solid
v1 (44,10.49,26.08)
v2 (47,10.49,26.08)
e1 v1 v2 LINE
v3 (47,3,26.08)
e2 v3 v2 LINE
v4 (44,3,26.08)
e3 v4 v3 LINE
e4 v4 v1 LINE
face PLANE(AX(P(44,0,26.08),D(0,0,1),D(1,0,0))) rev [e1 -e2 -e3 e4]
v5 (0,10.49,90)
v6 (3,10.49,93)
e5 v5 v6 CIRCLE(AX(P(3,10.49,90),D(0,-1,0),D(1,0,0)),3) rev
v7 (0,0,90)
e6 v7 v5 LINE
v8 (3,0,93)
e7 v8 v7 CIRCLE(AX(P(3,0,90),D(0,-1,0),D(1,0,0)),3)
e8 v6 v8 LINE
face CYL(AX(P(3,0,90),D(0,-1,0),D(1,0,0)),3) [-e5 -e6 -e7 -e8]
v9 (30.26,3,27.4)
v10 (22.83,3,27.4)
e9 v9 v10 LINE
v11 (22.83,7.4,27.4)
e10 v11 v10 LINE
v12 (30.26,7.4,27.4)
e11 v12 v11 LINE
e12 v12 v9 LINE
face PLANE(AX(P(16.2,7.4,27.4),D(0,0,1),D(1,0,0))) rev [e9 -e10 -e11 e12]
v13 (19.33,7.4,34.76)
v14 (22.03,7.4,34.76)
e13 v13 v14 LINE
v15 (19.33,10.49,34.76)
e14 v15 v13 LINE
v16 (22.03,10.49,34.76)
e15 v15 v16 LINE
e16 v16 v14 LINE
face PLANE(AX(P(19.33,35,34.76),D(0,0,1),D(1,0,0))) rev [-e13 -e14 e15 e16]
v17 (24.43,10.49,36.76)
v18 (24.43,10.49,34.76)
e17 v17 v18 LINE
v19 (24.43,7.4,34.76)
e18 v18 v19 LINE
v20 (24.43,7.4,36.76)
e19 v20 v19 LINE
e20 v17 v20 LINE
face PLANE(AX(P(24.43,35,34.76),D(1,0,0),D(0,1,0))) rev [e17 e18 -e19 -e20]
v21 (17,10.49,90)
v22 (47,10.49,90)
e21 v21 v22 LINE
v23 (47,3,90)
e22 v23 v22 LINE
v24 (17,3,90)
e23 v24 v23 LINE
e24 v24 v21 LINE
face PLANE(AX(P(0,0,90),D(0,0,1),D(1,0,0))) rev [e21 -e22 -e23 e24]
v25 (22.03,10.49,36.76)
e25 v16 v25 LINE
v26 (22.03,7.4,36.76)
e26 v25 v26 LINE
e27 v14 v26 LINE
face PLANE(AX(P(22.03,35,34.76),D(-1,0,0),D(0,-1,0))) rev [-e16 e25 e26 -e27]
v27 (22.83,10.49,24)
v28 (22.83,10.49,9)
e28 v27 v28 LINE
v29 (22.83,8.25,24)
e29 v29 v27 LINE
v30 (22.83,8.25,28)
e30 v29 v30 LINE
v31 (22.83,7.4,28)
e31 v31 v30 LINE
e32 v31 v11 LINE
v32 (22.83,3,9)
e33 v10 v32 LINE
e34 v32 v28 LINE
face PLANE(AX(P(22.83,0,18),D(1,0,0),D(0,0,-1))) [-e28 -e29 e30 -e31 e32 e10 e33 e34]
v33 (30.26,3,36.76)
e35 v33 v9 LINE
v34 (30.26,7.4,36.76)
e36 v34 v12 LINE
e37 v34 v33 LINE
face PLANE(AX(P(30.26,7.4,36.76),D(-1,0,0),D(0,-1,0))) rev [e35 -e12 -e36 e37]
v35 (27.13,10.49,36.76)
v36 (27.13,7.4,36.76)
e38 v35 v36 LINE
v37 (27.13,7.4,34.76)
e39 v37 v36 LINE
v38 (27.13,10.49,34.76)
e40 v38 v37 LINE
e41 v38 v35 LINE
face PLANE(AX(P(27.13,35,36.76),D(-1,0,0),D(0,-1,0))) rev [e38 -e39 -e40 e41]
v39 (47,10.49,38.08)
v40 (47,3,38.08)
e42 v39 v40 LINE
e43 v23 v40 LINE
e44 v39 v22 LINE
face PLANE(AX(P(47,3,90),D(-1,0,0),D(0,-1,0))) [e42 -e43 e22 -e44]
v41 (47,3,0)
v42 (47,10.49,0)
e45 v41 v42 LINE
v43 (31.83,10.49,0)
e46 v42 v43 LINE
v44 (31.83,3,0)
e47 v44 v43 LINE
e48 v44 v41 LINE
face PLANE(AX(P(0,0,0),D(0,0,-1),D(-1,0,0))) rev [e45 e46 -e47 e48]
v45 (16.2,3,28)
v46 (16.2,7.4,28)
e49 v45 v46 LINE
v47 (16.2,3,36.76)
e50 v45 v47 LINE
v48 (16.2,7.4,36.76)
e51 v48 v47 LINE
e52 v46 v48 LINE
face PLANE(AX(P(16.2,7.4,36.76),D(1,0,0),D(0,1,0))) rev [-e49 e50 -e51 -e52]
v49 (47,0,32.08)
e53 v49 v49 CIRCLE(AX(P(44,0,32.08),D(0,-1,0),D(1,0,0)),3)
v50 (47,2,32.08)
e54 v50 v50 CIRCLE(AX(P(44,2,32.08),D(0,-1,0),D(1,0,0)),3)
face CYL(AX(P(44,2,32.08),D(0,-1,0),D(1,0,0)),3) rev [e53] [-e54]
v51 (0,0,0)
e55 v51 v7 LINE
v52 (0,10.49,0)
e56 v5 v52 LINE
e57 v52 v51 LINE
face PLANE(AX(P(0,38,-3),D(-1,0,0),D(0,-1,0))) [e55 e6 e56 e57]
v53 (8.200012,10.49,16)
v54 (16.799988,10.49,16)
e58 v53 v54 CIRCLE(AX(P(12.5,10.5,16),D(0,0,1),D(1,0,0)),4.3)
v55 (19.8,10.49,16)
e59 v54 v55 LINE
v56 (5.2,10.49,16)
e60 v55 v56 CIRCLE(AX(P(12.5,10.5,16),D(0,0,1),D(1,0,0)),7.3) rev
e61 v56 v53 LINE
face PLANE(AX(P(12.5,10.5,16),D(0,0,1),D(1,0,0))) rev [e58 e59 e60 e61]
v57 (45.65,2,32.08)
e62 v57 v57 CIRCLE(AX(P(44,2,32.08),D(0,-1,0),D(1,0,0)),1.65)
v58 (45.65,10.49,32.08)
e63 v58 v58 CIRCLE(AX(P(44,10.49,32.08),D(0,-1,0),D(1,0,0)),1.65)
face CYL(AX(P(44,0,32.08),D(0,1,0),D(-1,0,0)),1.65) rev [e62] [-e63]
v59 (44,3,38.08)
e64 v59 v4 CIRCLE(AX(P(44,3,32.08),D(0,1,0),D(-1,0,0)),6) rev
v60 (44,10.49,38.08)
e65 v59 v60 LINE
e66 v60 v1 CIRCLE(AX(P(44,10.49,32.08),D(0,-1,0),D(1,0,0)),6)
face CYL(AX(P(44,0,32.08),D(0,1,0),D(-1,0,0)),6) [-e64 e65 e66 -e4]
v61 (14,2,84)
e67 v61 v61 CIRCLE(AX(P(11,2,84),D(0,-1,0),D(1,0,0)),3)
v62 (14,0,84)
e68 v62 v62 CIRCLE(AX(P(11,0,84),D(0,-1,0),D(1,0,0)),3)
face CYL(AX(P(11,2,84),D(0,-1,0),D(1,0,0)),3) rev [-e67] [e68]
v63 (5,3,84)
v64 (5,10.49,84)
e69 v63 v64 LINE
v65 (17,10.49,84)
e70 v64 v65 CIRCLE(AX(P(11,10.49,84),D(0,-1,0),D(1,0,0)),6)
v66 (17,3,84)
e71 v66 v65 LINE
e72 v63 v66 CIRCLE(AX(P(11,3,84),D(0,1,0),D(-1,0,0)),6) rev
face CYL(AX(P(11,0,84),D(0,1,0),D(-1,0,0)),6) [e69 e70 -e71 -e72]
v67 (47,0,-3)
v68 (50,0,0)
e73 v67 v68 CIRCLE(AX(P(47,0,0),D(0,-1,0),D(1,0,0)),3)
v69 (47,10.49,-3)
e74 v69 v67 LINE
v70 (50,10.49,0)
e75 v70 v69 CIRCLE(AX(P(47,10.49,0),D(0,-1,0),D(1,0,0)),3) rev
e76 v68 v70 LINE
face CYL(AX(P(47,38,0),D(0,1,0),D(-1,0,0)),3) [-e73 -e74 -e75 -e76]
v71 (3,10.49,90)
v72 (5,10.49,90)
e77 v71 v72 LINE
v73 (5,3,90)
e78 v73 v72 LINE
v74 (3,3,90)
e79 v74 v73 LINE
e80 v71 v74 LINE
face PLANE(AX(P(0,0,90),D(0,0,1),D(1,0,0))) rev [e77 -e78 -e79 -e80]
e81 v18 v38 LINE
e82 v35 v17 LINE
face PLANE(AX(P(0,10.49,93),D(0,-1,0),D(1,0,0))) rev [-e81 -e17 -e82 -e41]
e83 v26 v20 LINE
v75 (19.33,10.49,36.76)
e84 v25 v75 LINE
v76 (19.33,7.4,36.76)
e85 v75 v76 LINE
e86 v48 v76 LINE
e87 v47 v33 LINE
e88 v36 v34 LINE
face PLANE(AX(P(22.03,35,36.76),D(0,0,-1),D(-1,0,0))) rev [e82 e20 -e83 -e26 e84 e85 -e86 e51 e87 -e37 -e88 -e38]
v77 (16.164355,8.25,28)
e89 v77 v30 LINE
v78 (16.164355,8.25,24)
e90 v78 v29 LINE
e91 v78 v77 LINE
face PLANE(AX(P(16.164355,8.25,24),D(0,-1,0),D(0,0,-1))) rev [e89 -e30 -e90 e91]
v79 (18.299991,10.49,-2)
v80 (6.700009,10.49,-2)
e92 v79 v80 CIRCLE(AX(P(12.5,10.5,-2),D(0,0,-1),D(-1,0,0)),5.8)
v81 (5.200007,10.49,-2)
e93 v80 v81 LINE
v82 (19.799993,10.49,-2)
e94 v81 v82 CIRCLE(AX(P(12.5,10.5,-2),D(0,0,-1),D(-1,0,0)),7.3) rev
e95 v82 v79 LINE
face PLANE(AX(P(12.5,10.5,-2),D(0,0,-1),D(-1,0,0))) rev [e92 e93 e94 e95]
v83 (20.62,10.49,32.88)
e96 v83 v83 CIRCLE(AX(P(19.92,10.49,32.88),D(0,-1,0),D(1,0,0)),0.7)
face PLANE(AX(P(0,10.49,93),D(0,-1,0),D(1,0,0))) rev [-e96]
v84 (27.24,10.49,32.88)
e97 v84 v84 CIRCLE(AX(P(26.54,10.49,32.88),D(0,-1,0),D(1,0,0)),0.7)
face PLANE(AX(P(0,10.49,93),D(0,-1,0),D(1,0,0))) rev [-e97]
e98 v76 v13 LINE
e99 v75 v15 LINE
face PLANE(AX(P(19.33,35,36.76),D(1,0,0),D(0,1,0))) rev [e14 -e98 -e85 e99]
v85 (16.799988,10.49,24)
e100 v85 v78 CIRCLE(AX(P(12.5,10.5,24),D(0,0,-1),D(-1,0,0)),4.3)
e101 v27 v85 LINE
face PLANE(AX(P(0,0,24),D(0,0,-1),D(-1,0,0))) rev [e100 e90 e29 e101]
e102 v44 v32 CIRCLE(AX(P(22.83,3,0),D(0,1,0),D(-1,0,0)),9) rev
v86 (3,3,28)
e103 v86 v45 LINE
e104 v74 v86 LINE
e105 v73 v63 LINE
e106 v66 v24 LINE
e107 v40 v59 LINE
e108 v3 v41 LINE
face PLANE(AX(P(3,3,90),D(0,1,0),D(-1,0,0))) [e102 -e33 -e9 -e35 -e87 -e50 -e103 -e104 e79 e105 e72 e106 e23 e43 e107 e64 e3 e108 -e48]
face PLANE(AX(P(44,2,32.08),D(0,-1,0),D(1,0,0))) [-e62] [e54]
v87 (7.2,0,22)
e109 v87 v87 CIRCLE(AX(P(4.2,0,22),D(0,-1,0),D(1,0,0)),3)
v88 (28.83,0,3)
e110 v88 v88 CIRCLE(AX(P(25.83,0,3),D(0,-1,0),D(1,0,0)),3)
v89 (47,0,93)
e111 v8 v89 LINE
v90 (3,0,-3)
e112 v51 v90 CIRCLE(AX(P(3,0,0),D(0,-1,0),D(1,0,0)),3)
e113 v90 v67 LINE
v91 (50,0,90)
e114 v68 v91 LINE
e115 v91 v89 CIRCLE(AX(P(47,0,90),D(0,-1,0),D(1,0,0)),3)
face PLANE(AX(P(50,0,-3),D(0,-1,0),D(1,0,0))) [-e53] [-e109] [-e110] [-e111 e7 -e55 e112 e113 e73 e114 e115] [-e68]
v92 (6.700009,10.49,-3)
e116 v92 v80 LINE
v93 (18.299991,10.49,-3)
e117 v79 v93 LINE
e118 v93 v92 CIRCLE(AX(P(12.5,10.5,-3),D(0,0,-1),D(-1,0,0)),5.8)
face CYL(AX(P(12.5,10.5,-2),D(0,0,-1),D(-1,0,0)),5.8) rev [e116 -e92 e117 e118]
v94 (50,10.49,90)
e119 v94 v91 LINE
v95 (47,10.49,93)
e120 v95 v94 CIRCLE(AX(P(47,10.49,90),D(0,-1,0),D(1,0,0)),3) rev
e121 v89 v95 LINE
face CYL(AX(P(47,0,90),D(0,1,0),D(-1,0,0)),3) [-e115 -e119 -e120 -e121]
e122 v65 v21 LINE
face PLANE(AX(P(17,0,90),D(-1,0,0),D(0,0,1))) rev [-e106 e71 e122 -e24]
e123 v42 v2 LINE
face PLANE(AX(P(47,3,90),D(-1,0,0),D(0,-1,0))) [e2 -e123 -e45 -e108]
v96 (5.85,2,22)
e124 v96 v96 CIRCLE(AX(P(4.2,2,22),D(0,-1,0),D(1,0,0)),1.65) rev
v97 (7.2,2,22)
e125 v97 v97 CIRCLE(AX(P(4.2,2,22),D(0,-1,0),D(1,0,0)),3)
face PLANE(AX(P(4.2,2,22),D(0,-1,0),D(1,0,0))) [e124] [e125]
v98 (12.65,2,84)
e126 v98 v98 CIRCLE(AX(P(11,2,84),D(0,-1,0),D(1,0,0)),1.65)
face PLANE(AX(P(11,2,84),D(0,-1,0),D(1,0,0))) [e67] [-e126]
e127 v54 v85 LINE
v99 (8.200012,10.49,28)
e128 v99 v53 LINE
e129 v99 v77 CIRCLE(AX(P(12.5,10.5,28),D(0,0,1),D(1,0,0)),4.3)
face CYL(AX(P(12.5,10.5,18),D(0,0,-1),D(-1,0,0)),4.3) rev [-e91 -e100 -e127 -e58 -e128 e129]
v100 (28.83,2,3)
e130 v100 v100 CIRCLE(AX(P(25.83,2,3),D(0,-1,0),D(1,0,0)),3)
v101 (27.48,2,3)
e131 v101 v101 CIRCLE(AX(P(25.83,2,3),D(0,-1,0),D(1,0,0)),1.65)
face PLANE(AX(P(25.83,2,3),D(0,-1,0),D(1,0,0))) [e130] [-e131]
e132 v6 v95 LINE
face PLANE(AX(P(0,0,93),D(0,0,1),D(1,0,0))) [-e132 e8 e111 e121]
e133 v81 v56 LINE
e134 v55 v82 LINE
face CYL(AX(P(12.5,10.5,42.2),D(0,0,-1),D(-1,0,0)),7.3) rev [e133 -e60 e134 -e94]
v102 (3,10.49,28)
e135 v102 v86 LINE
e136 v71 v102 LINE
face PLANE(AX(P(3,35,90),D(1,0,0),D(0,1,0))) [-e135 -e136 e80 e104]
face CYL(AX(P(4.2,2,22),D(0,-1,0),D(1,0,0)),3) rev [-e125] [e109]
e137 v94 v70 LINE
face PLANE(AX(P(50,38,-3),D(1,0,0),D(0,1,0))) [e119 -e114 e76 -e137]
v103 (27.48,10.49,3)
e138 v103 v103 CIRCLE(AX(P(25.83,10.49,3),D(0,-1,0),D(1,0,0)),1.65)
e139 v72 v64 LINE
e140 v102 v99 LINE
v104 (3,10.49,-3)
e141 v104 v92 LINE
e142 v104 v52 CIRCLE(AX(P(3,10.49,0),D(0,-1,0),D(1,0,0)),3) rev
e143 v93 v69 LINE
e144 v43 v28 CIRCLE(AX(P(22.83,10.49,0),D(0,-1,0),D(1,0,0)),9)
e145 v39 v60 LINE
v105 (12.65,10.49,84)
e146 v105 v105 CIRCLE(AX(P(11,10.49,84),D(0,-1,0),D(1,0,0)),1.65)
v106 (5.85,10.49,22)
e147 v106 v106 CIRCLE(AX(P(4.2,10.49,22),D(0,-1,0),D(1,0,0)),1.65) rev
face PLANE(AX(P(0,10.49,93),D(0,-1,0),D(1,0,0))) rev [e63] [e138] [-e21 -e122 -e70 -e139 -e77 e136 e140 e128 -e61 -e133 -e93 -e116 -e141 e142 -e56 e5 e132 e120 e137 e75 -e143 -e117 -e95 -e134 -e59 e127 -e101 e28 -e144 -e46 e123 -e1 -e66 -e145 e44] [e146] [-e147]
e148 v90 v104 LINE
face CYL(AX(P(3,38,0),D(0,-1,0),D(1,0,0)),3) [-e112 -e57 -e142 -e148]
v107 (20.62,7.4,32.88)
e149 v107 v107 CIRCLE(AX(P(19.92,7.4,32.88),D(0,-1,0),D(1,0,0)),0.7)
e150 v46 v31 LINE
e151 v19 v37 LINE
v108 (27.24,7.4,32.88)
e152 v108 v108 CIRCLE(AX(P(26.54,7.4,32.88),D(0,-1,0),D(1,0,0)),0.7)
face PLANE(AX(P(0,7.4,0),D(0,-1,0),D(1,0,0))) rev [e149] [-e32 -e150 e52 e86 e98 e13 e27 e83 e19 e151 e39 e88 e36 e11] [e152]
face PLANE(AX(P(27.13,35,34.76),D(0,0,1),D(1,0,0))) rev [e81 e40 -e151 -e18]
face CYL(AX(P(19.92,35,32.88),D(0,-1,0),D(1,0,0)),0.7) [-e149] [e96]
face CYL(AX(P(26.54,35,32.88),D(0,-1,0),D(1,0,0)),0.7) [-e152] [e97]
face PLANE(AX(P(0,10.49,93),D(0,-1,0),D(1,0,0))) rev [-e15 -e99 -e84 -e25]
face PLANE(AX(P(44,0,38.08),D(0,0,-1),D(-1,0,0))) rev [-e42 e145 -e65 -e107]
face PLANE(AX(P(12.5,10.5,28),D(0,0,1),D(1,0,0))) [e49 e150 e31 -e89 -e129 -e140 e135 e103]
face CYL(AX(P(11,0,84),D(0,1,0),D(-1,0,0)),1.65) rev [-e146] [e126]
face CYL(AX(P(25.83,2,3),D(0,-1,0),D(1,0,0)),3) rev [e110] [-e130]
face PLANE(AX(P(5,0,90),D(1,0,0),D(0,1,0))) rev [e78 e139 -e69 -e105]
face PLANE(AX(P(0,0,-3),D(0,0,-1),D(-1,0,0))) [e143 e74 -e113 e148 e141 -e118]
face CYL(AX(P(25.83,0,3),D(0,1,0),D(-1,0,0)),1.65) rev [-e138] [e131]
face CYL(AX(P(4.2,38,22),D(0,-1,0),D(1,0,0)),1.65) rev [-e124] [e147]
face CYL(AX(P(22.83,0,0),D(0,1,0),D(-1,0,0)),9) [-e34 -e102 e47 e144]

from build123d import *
from build123d.topology import SkipClean

# Parameters (mm, degrees)
SKETCH_1_W               = 50
SKETCH_1_H               = 38
EXTRUDE_1_DEPTH          = 3
SKETCH_2_W               = 50
SKETCH_2_H               = 38
SKETCH_2_W_2             = 44
SKETCH_2_H_2             = 32
EXTRUDE_2_DEPTH          = 90
SKETCH_4_R               = 7.3
CUT_EXTRUDE_1_DEPTH      = 45.2
SKETCH_5_R               = 10.3
SKETCH_5_R_2             = 7.3
EXTRUDE_3_DEPTH          = 16
SKETCH_6_R               = 8.3
SKETCH_6_R_2             = 5.8
EXTRUDE_5_DEPTH          = 1
SKETCH_7_R               = 4.3
EXTRUDE_6_DEPTH          = 2
SKETCH_8_R               = 6.3
SKETCH_8_R_2             = 4.3
EXTRUDE_7_DEPTH          = 10
SKETCH_9_W               = 2.635644668
SKETCH_9_H               = 4.5
CUT_EXTRUDE_2_DEPTH      = 4
SKETCH_10_R              = 0.7
SKETCH_10_W              = 2.7
SKETCH_10_H              = 2
EXTRUDE_8_DEPTH          = 32
SKETCH_11_W              = 14.06
SKETCH_11_H              = 9.36
EXTRUDE_9_DEPTH          = 4.4
SKETCH_12_W              = 14.06
SKETCH_12_H              = 9.36
EXTRUDE_10_DEPTH         = 21.2
CUT_EXTRUDE_3_DEPTH      = 3
SKETCH_14_R              = 1.65
EXTRUDE_11_DEPTH         = 15.5
EXTRUDE_12_DEPTH         = 15.5
CUT_EXTRUDE_4_DEPTH      = 0.8
EXTRUDE_13_DEPTH         = 18
SKETCH_18_W              = 19.83
SKETCH_18_H              = 32
SKETCH_18_R              = 6.3
EXTRUDE_14_DEPTH         = 10
SKETCH_19_W              = 4.445486426
SKETCH_19_H              = 4.5
CUT_EXTRUDE_5_DEPTH      = 4
EXTRUDE_16_REACH         = 110.743
SKETCH_23_R              = 1.65
CUT_EXTRUDE_7_DEPTH      = 109.742815855
CUT_EXTRUDE_7_DEPTH_BACK = 109.742815855
SKETCH_25_R              = 1.65
CUT_EXTRUDE_8_DEPTH      = 24.5
SKETCH_29_W              = 50
SKETCH_29_H              = 38
EXTRUDE_17_DEPTH         = 3
FILLET_1_R               = 3
SKETCH_30_W              = 96
SKETCH_30_H              = 0.02
CUT_EXTRUDE_9_DEPTH      = 113.218536793
SKETCH_31_R              = 3
CUT_EXTRUDE_10_DEPTH     = 2


with BuildPart() as part:
    # 草图1 → 凸台-拉伸1 (new body)
    with BuildSketch(Plane.XY):
        with Locations((25, 19)):
            Rectangle(SKETCH_1_W, SKETCH_1_H)
    extrude(amount=-EXTRUDE_1_DEPTH)

    # 草图2 → 凸台-拉伸2 (add)
    with BuildSketch(Plane.XY):
        with Locations((25, 19)):
            Rectangle(SKETCH_2_W, SKETCH_2_H)
        with Locations((25, 19)):
            Rectangle(SKETCH_2_W_2, SKETCH_2_H_2, mode=Mode.SUBTRACT)
    extrude(amount=EXTRUDE_2_DEPTH)

    # 草图4 → 切除-拉伸1 (cut)
    with BuildSketch(Plane(origin=(0, 0, -3), x_dir=(-1, 0, 0), z_dir=(0, 0, -1))):
        with Locations((-12.5, 10.5)):
            Circle(SKETCH_4_R)
    extrude(amount=-CUT_EXTRUDE_1_DEPTH, mode=Mode.SUBTRACT)

    # 草图5 → 凸台-拉伸3 (add)
    with BuildSketch(Plane.XY):
        with Locations((12.5, 10.5)):
            Circle(SKETCH_5_R)
        with Locations(Location((12.5, 10.5, 0), (0, 0, 180))):
            Circle(SKETCH_5_R_2, mode=Mode.SUBTRACT)
    extrude(amount=EXTRUDE_3_DEPTH)

    # 草图6 → 凸台-拉伸5 (add)
    with BuildSketch(Plane(origin=(0, 0, -3), x_dir=(-1, 0, 0), z_dir=(0, 0, -1))):
        with Locations((-12.5, 10.5)):
            Circle(SKETCH_6_R)
        with Locations((-12.5, 10.5)):
            Circle(SKETCH_6_R_2, mode=Mode.SUBTRACT)
    extrude(amount=-EXTRUDE_5_DEPTH)

    # 草图7 → 凸台-拉伸6 (add)
    with BuildSketch(Plane.XY.offset(16)):
        with BuildLine():
            Line((5.440254962, 3), (19.559745038, 3))
            ThreePointArc((19.559745038, 3), (18.368221419, 18.964867239), (3, 14.479949748))
            Line((3, 14.479949748), (3, 6.520050252))
            ThreePointArc((3, 6.520050252), (4.035132761, 4.631778581), (5.440254962, 3))
        make_face()
        with Locations((12.5, 10.5)):
            Circle(SKETCH_7_R, mode=Mode.SUBTRACT)
    extrude(amount=EXTRUDE_6_DEPTH)

    # 草图8 → 凸台-拉伸7 (add)
    with BuildSketch(Plane.XY.offset(18)):
        with Locations((12.5, 10.5)):
            Circle(SKETCH_8_R)
        with Locations((12.5, 10.5)):
            Circle(SKETCH_8_R_2, mode=Mode.SUBTRACT)
    extrude(amount=EXTRUDE_7_DEPTH)

    # 草图9 → 切除-拉伸2 (cut)
    with BuildSketch(Plane.XY.offset(28)):
        with Locations((17.482177666, 10.5)):
            Rectangle(SKETCH_9_W, SKETCH_9_H)
    extrude(amount=-CUT_EXTRUDE_2_DEPTH, mode=Mode.SUBTRACT)

    # 草图10 → 凸台-拉伸8 (add)
    with BuildSketch(Plane(origin=(0, 3, 0), x_dir=(1, 0, 0), z_dir=(0, 1, 0))):
        with Locations(Location((19.92, -32.88, 0), (0, 0, 180))):
            Circle(SKETCH_10_R)
        with Locations(Location((26.54, -32.88, 0), (0, 0, 180))):
            Circle(SKETCH_10_R)
        with Locations((20.68, -35.76)):
            Rectangle(SKETCH_10_W, SKETCH_10_H)
        with Locations((25.78, -35.76)):
            Rectangle(SKETCH_10_W, SKETCH_10_H)
    extrude(amount=EXTRUDE_8_DEPTH)

    # 草图11 → 凸台-拉伸9 (add)
    with BuildSketch(Plane(origin=(0, 3, 0), x_dir=(1, 0, 0), z_dir=(0, 1, 0))):
        with Locations((23.23, -32.08)):
            Rectangle(SKETCH_11_W, SKETCH_11_H)
    extrude(amount=EXTRUDE_9_DEPTH)

    # 草图12 → 凸台-拉伸10 (add)
    with BuildSketch(Plane.XZ.offset(-35)):
        with Locations((23.23, 32.08)):
            Rectangle(SKETCH_12_W, SKETCH_12_H)
    extrude(amount=EXTRUDE_10_DEPTH)

    # 草图13 → 切除-拉伸3 (cut)
    with BuildSketch(Plane(origin=(0, 38, 0), x_dir=(1, 0, 0), z_dir=(0, 1, 0))):
        with BuildLine():
            Line((38.62497216, -74.195968058), (44.4, -74.195968058))
            ThreePointArc((44.4, -74.195968058), (45.107106781, -73.903074839), (45.4, -73.195968058))
            Line((45.4, -73.195968058), (45.4, -54.995968058))
            ThreePointArc((45.4, -54.995968058), (45.107106781, -54.288861277), (44.4, -53.995968058))
            Line((44.4, -53.995968058), (38.62497216, -53.995968058))
            ThreePointArc((38.62497216, -53.995968058), (12.3, -64.095968058), (38.62497216, -74.195968058))
        make_face()
    extrude(amount=-CUT_EXTRUDE_3_DEPTH, mode=Mode.SUBTRACT)

    # 草图14 → 凸台-拉伸11 (add)
    # profile 1 of 2: a face of its own
    with SkipClean():  # the faces are left unmerged after this step: merging them gives an invalid solid
        with BuildSketch(Plane.XZ.offset(-35)):
            with BuildLine():
                Line((23.9, 46.595968058), (23.9, 49.407196837))
                ThreePointArc((23.9, 49.407196837), (27.4, 48.995968058), (30.9, 49.407196837))
                Line((30.9, 49.407196837), (30.9, 46.595968058))
                ThreePointArc((30.9, 46.595968058), (27.4, 43.095968058), (23.9, 46.595968058))
            make_face()
            with Locations((27.4, 46.595968058)):
                Circle(SKETCH_14_R, mode=Mode.SUBTRACT)
        # profile 2 of 2: a face of its own
        with BuildSketch(Plane.XZ.offset(-35)):
            with BuildLine():
                Line((30.9, 81.595968058), (30.9, 78.78473928))
                ThreePointArc((30.9, 78.78473928), (27.4, 79.195968058), (23.9, 78.78473928))
                Line((23.9, 78.78473928), (23.9, 81.595968058))
                ThreePointArc((23.9, 81.595968058), (27.4, 85.095968058), (30.9, 81.595968058))
            make_face()
            with Locations(Location((27.4, 81.595968058, 0), (0, 0, 90))):
                Circle(SKETCH_14_R, mode=Mode.SUBTRACT)
        extrude(amount=EXTRUDE_11_DEPTH)

    # 草图15 → 凸台-拉伸12 (add)
    with SkipClean():  # the faces are left unmerged after this step: merging them gives an invalid solid
        with BuildSketch(Plane.XZ.offset(-35)):
            with BuildLine():
                ThreePointArc((23.9, 49.407196837), (22.109340992, 49.953163271), (20.4, 50.716506186))
                Line((20.4, 50.716506186), (20.4, 46.595968058))
                ThreePointArc((20.4, 46.595968058), (27.4, 39.595968058), (34.4, 46.595968058))
                Line((34.4, 46.595968058), (34.4, 50.716506186))
                ThreePointArc((34.4, 50.716506186), (32.690659008, 49.953163271), (30.9, 49.407196837))
                Line((30.9, 49.407196837), (30.9, 46.595968058))
                ThreePointArc((30.9, 46.595968058), (27.4, 43.095968058), (23.9, 46.595968058))
                Line((23.9, 46.595968058), (23.9, 49.407196837))
            make_face()
            with BuildLine():
                Line((20.4, 81.595968058), (20.4, 77.475429931))
                ThreePointArc((20.4, 77.475429931), (22.109340992, 78.238772846), (23.9, 78.78473928))
                Line((23.9, 78.78473928), (23.9, 81.595968058))
                ThreePointArc((23.9, 81.595968058), (27.4, 85.095968058), (30.9, 81.595968058))
                Line((30.9, 81.595968058), (30.9, 78.78473928))
                ThreePointArc((30.9, 78.78473928), (32.690659008, 78.238772846), (34.4, 77.475429931))
                Line((34.4, 77.475429931), (34.4, 81.595968058))
                ThreePointArc((34.4, 81.595968058), (27.4, 88.595968058), (20.4, 81.595968058))
            make_face()
        extrude(amount=EXTRUDE_12_DEPTH)

    # 草图16 → 切除-拉伸4 (cut)
    with SkipClean():  # the faces are left unmerged after this step: merging them gives an invalid solid
        with BuildSketch(Plane.XZ.offset(-19.5)):
            with BuildLine():
                Line((31.3, 81.595968058), (31.3, 77.229132186))
                ThreePointArc((31.3, 77.229132186), (27.4, 77.795968058), (23.5, 77.229132186))
                Line((23.5, 77.229132186), (23.5, 81.595968058))
                ThreePointArc((23.5, 81.595968058), (27.4, 85.495968058), (31.3, 81.595968058))
            make_face()
            with BuildLine():
                Line((31.3, 46.595968058), (31.3, 50.962803931))
                ThreePointArc((31.3, 50.962803931), (27.4, 50.395968058), (23.5, 50.962803931))
                Line((23.5, 50.962803931), (23.5, 46.595968058))
                ThreePointArc((23.5, 46.595968058), (27.4, 42.695968058), (31.3, 46.595968058))
            make_face()
        extrude(amount=-CUT_EXTRUDE_4_DEPTH, mode=Mode.SUBTRACT)

    # 草图17 → 凸台-拉伸13 (add)
    with SkipClean():  # the faces are left unmerged after this step: merging them gives an invalid solid
        with BuildSketch(Plane.XY):
            with BuildLine():
                Line((22.83, 3), (22.83, 10.539153682))
                Line((22.83, 10.539153682), (22.83, 35))
                Line((22.83, 35), (3, 35))
                Line((3, 35), (3, 14.479949748))
                ThreePointArc((3, 14.479949748), (18.368221419, 18.964867239), (19.559745038, 3))
                Line((19.559745038, 3), (22.83, 3))
            make_face()
            with BuildLine():
                Line((5.440254962, 3), (3, 3))
                Line((3, 3), (3, 6.520050252))
                ThreePointArc((3, 6.520050252), (4.035132761, 4.631778581), (5.440254962, 3))
            make_face()
        extrude(amount=EXTRUDE_13_DEPTH)

    # 草图18 → 凸台-拉伸14 (add)
    with SkipClean():  # the faces are left unmerged after this step: merging them gives an invalid solid
        with BuildSketch(Plane.XY.offset(18)):
            with Locations((12.915, 19)):
                Rectangle(SKETCH_18_W, SKETCH_18_H)
            with Locations((12.5, 10.5)):
                Circle(SKETCH_18_R, mode=Mode.SUBTRACT)
        extrude(amount=EXTRUDE_14_DEPTH)

    # 草图19 → 切除-拉伸5 (cut)
    with SkipClean():  # the faces are left unmerged after this step: merging them gives an invalid solid
        with BuildSketch(Plane.XY.offset(28)):
            with Locations((20.607256787, 10.5)):
                Rectangle(SKETCH_19_W, SKETCH_19_H)
        extrude(amount=-CUT_EXTRUDE_5_DEPTH, mode=Mode.SUBTRACT)

    # 草图23 → 凸台-拉伸16 (add, up to next)
    with BuildSketch(Plane.XZ.offset(-35), mode=Mode.PRIVATE) as extrude_16_sk1:
        with BuildLine():
            Line((22.83, 0), (22.83, 9))
            ThreePointArc((22.83, 9), (29.193961031, 6.363961031), (31.83, 0))
            Line((31.83, 0), (22.83, 0))
        make_face()
        with Locations(Location((25.83, 3, 0), (0, 0, 180))):
            Circle(SKETCH_23_R, mode=Mode.SUBTRACT)
    extrude_16_tool1 = extrude(extrude_16_sk1.sketch, amount=EXTRUDE_16_REACH, mode=Mode.PRIVATE) - part.part
    # 草图23 → 凸台-拉伸16 (add, up to next)
    with BuildSketch(Plane.XZ.offset(-35), mode=Mode.PRIVATE) as extrude_16_sk2:
        with BuildLine():
            Line((44, 26.08), (47, 26.08))
            Line((47, 26.08), (47, 38.08))
            Line((47, 38.08), (44, 38.08))
            ThreePointArc((44, 38.08), (38, 32.08), (44, 26.08))
        make_face()
        with Locations(Location((44, 32.08, 0), (0, 0, 180))):
            Circle(SKETCH_23_R, mode=Mode.SUBTRACT)
    extrude_16_tool2 = extrude(extrude_16_sk2.sketch, amount=EXTRUDE_16_REACH, mode=Mode.PRIVATE) - part.part
    # 草图23 → 凸台-拉伸16 (add, up to next)
    with BuildSketch(Plane.XZ.offset(-35), mode=Mode.PRIVATE) as extrude_16_sk3:
        with BuildLine():
            Line((5, 90), (5, 84))
            ThreePointArc((5, 84), (11, 78), (17, 84))
            Line((17, 84), (17, 90))
            Line((17, 90), (5, 90))
        make_face()
        with Locations(Location((11, 84, 0), (0, 0, 180))):
            Circle(SKETCH_23_R, mode=Mode.SUBTRACT)
    extrude_16_tool3 = extrude(extrude_16_sk3.sketch, amount=EXTRUDE_16_REACH, mode=Mode.PRIVATE) - part.part
    add(extrude_16_tool1.solids().sort_by_distance((27.33, 35, 0.127279))[0])
    add(extrude_16_tool2.solids().sort_by_distance((45.5, 35, 26.23))[0])
    add(extrude_16_tool3.solids().sort_by_distance((11, 35, 78.169706))[0])

    # 草图25 → 切除-拉伸7 (cut, two sides: drawn at the far end of the back side and taken through both)
    with BuildSketch(Plane.XZ.offset(-35).offset(-CUT_EXTRUDE_7_DEPTH_BACK)):
        with Locations((4.2, 22)):
            Circle(SKETCH_25_R)
        with Locations((25.83, 3)):
            Circle(SKETCH_25_R)
        with Locations((44, 32.08)):
            Circle(SKETCH_25_R)
        with Locations((11, 84)):
            Circle(SKETCH_25_R)
    extrude(amount=CUT_EXTRUDE_7_DEPTH + CUT_EXTRUDE_7_DEPTH_BACK, mode=Mode.SUBTRACT)

    # 草图26 → 切除-拉伸8 (cut)
    with SkipClean():  # the faces are left unmerged after this step: merging them gives an invalid solid
        with BuildSketch(Plane(origin=(0, 38, 0), x_dir=(1, 0, 0), z_dir=(0, 1, 0))):
            Polygon((4.2, -18.537081721), (1.201024799, -20.268540861), (1.201024799, -23.731459139), (4.2, -25.462918279), (7.198975201, -23.731459139), (7.198975201, -20.268540861), align=None)
            Polygon((25.83, -6.462918279), (28.828975201, -4.731459139), (28.828975201, -1.268540861), (25.83, 0.462918279), (22.831024799, -1.268540861), (22.831024799, -4.731459139), align=None)
            Polygon((11, -80.537081721), (8.001024799, -82.268540861), (8.001024799, -85.731459139), (11, -87.462918279), (13.998975201, -85.731459139), (13.998975201, -82.268540861), align=None)
            Polygon((44, -28.617081721), (41.001024799, -30.348540861), (41.001024799, -33.811459139), (44, -35.542918279), (46.998975201, -33.811459139), (46.998975201, -30.348540861), align=None)
        extrude(amount=-CUT_EXTRUDE_8_DEPTH, mode=Mode.SUBTRACT)

    # 草图29 → 凸台-拉伸17 (add)
    with SkipClean():  # the faces are left unmerged after this step: merging them gives an invalid solid
        with BuildSketch(Plane.XY.offset(90)):
            with Locations((25, 19)):
                Rectangle(SKETCH_29_W, SKETCH_29_H)
        extrude(amount=EXTRUDE_17_DEPTH)

    # 圆角1
    fillet_1_edges = [part.edges().sort_by_distance(p)[0] for p in [
        (0, 19, -3),
        (50, 19, -3),
        (0, 19, 93),
        (50, 19, 93),
    ]]
    fillet(fillet_1_edges, radius=FILLET_1_R - 0.0001)  # a hair under: the kernel refuses the full size

    # 草图30 → 切除-拉伸9 (cut, through all)
    with BuildSketch(Plane(origin=(50, 0, 0), x_dir=(0, 0, -1), z_dir=(1, 0, 0))):
        with Locations((-45, 10.5)):
            Rectangle(SKETCH_30_W, SKETCH_30_H)
    extrude(amount=-CUT_EXTRUDE_9_DEPTH, mode=Mode.SUBTRACT)


with BuildPart() as cut_extrude_9_piece_1:
    # of the separate pieces the step leaves, piece 1, a body of its own (cut_extrude_9_pieces)
    add(part.part.solids().sort_by_distance((47.0001, 38, -3))[0])


with BuildPart() as cut_extrude_9_piece_2:
    # of the separate pieces the step leaves, piece 2, a body of its own (cut_extrude_9_pieces)
    add(part.part.solids().sort_by_distance((47.0001, 0, -3))[0])

    # 草图31 → 切除-拉伸10 (cut)
    with BuildSketch(Plane.XZ):
        with Locations((4.2, 22)):
            Circle(SKETCH_31_R)
        with Locations((25.83, 3)):
            Circle(SKETCH_31_R)
        with Locations((11, 84)):
            Circle(SKETCH_31_R)
        with Locations((44, 32.08)):
            Circle(SKETCH_31_R)
    extrude(amount=-CUT_EXTRUDE_10_DEPTH, mode=Mode.SUBTRACT)


solid = cut_extrude_9_piece_2.part
